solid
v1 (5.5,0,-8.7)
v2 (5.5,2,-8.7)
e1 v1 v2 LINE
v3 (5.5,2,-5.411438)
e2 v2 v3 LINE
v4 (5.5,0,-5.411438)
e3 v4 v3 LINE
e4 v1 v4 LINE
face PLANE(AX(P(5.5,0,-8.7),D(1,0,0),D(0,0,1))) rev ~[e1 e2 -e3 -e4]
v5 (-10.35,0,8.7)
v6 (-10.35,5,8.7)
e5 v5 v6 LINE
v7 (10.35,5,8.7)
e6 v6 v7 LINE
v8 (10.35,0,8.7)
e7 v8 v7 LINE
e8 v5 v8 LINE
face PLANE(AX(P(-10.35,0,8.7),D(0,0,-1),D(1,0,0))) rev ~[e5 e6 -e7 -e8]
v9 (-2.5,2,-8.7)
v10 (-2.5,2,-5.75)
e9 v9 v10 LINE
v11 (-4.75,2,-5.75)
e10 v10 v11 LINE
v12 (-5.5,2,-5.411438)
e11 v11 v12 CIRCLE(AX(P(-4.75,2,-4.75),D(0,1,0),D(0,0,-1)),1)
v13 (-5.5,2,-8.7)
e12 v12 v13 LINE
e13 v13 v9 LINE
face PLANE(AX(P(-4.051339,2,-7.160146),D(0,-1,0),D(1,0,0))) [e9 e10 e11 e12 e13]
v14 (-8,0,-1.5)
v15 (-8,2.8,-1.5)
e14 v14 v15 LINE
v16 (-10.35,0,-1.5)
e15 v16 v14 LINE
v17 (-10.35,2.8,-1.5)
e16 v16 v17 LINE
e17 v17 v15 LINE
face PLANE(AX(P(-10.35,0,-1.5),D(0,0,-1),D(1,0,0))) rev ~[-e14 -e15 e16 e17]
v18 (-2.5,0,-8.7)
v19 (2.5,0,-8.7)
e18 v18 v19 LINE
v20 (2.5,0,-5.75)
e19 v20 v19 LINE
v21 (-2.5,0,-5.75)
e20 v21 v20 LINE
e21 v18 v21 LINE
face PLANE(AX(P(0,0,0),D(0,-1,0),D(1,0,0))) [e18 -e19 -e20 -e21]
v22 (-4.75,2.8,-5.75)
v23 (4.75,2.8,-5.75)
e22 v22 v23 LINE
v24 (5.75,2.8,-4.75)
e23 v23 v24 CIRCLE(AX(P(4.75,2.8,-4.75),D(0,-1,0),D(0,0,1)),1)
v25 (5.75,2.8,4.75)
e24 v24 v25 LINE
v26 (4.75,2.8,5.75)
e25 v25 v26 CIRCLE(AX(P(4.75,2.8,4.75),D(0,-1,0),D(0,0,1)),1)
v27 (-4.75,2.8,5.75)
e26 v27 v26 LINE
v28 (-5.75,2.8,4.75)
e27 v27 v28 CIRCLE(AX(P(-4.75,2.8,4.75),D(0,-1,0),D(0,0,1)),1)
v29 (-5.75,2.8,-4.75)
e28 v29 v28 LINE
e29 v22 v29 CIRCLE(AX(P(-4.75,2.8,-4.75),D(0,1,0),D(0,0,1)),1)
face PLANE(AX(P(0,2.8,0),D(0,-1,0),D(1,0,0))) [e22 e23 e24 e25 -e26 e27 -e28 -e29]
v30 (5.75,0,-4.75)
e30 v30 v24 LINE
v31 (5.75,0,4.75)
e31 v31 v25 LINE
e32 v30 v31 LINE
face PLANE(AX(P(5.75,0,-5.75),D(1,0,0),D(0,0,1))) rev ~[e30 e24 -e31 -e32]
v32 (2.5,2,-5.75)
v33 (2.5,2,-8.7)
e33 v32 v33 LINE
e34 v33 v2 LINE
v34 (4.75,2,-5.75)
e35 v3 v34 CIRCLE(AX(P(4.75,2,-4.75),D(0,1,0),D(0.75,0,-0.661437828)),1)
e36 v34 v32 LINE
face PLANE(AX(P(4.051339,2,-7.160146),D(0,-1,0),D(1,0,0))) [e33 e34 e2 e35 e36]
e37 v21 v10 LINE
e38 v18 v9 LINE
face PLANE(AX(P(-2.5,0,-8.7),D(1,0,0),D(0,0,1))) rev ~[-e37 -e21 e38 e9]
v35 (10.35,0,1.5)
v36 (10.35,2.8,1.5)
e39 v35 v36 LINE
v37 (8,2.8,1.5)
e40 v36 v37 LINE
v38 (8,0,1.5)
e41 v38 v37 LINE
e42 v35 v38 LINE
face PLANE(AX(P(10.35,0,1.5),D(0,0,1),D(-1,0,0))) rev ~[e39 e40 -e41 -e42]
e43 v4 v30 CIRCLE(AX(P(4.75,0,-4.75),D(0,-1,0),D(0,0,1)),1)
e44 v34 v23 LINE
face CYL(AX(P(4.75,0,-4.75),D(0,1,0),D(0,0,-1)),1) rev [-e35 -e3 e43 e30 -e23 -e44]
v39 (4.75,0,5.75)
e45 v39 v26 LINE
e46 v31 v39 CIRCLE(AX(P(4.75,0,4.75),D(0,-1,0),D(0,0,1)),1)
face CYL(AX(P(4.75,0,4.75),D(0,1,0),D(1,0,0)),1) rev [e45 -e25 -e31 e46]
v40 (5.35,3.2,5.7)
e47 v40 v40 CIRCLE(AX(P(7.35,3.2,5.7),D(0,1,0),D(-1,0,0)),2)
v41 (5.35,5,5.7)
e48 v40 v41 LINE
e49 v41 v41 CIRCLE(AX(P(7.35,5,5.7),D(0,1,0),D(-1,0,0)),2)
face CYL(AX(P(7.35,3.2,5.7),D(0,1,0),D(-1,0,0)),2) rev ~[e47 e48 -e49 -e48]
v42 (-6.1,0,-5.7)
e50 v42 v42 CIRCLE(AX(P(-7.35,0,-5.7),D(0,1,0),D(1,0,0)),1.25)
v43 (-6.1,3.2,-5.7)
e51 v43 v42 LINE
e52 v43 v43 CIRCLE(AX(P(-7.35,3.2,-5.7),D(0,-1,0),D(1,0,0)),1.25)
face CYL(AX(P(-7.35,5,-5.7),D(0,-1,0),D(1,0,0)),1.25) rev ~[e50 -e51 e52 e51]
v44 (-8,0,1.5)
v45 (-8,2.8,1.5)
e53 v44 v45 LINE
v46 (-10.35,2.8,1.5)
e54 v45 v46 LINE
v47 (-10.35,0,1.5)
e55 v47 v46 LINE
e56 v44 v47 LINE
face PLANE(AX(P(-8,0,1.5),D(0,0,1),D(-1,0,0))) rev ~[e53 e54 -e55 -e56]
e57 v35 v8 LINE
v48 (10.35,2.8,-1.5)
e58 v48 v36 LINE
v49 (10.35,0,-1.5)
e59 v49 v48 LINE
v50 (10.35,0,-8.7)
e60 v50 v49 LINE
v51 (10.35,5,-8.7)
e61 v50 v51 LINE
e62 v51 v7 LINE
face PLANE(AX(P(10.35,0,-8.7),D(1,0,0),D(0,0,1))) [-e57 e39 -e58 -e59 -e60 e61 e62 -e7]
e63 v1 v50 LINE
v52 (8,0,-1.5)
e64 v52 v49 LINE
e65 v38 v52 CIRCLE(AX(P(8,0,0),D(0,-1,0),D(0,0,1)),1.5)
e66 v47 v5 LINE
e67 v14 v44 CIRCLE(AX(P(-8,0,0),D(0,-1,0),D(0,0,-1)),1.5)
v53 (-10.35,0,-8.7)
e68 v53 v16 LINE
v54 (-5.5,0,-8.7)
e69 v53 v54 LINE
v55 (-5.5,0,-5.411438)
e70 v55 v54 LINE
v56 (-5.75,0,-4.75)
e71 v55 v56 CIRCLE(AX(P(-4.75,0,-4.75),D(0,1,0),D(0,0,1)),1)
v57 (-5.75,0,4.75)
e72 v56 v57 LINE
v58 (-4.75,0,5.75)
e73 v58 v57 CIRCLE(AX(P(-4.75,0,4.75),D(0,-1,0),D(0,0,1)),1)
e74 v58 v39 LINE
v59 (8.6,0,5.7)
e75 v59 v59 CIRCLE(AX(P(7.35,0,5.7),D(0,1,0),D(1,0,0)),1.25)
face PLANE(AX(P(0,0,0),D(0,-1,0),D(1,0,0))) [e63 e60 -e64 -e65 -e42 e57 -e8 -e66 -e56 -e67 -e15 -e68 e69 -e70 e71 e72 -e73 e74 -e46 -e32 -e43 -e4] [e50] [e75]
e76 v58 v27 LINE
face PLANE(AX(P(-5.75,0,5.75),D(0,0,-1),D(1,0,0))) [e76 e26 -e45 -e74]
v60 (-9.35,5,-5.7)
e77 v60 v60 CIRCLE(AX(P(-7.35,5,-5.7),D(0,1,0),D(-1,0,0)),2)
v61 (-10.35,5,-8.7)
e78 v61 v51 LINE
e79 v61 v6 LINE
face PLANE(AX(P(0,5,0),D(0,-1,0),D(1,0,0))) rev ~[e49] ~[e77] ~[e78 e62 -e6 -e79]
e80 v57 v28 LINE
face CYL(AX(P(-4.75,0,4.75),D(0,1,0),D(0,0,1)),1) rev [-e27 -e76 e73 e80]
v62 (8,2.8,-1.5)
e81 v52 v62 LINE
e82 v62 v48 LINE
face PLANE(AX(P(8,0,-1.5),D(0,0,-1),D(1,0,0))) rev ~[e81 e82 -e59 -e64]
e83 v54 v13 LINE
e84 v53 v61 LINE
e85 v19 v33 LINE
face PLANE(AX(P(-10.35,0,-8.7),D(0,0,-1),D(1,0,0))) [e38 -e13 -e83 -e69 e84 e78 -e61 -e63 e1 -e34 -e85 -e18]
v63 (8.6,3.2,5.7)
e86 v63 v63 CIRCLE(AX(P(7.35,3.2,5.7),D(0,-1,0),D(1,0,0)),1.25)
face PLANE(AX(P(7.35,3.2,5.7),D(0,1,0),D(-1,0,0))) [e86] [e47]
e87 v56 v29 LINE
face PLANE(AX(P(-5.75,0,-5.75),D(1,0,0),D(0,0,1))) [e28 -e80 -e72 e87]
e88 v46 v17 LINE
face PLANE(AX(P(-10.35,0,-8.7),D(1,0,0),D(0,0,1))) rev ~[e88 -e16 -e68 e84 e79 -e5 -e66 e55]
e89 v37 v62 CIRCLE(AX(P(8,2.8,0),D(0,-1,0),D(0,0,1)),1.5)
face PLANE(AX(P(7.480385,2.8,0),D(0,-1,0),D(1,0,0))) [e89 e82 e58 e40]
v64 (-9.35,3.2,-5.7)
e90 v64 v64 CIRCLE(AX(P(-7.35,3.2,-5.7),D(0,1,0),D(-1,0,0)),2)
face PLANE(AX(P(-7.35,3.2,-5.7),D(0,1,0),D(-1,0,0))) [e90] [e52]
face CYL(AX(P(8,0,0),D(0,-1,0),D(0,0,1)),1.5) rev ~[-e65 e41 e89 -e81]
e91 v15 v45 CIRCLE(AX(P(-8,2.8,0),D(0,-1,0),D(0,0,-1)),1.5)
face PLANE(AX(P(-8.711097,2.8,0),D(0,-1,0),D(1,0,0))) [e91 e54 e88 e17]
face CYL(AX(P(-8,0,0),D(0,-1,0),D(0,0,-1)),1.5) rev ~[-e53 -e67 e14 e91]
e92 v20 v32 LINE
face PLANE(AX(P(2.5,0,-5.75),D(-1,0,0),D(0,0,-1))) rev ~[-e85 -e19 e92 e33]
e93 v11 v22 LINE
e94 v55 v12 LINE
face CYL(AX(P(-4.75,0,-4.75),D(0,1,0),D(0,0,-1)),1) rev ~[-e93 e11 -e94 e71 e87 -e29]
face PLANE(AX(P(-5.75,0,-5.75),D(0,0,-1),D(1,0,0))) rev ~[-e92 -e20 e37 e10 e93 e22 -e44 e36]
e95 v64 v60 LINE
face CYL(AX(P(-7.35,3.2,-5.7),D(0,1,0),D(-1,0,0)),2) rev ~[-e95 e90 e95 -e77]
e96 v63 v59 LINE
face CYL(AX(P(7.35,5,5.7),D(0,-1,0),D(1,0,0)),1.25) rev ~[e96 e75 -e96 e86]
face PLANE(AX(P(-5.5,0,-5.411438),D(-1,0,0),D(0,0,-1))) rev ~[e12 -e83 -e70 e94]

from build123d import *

# Parameters (mm, degrees)
F0_W           = 20.7
F0_H           = 17.4
F1_DEPTH       = 5
F2_W           = 11.5
F2_H           = 11.5
F3_DEPTH       = 2.8
F5_R           = 1
F7_DEPTH       = 2.8
F9_D           = 2.5
F9_DEPTH       = 5
F9_CBORE_D     = 4
F9_CBORE_DEPTH = 1.8
F9_TIP         = 0.7510757738
F11_DEPTH      = 2


# Not quite as in the source:
# - a feature names something its author has since deleted; it is built from what else it names


with BuildPart() as f1:
    # F0 (on Front) → F1 (new body)
    with BuildSketch(Plane.XZ):
        Rectangle(F0_W, F0_H)
    extrude(amount=-F1_DEPTH)

    # F2 (on face) → F3 (cut)
    with BuildSketch(Plane.XZ):
        Rectangle(F2_W, F2_H)
    extrude(amount=-F3_DEPTH, mode=Mode.SUBTRACT)

    # F5
    f5_edges = [f1.edges().sort_by_distance(p)[0] for p in [
        (-5.75, 1.4, 5.75),
        (5.75, 1.4, 5.75),
        (-5.75, 1.4, -5.75),
        (5.75, 1.4, -5.75),
    ]]
    fillet(f5_edges, radius=F5_R)

    # F6 (on face) → F7 (cut)
    with BuildSketch(Plane.XZ):
        with BuildLine():
            Line((-10.35, -1.5), (-8, -1.5))
            ThreePointArc((-8, -1.5), (-6.5, 0), (-8, 1.5))
            Line((-8, 1.5), (-10.35, 1.5))
            Line((-10.35, 1.5), (-10.35, -1.5))
        make_face()
        with BuildLine():
            ThreePointArc((8, 1.5), (6.5, 0), (8, -1.5))
            Line((8, -1.5), (8, 0))
            Line((8, 0), (8, 1.5))
        make_face()
        Polygon((8, -1.5), (10.35, -1.5), (10.35, 1.5), (8, 1.5), (8, 0), align=None)
    extrude(amount=-F7_DEPTH, mode=Mode.SUBTRACT)

    # F9
    with Locations(Plane(origin=(0, 5, 0), x_dir=(-1, 0, 0), z_dir=(0, 1, 0))):
        with Locations((7.35, -5.7), (-7.35, 5.7)):
            CounterBoreHole(F9_D / 2, F9_CBORE_D / 2, F9_CBORE_DEPTH, depth=F9_DEPTH)
            with Locations((0, 0, -(F9_DEPTH + F9_TIP / 2))):  # 118° drill point
                Cone(0, F9_D / 2, F9_TIP, mode=Mode.SUBTRACT)

    # F10 (on face) → F11 (cut)
    with BuildSketch(Plane.XZ):
        with BuildLine():
            Line((4.75, -5.75), (2.5, -5.75))
            Line((2.5, -5.75), (2.5, -8.7))
            Line((2.5, -8.7), (5.5, -8.7))
            Line((5.5, -8.7), (5.5, -5.4114378278))
            ThreePointArc((5.5, -5.4114378278), (5.1614378278, -5.6614378278), (4.75, -5.75))
        make_face()
        with BuildLine():
            Line((-2.5, -5.75), (-4.75, -5.75))
            ThreePointArc((-4.75, -5.75), (-5.1614378278, -5.6614378278), (-5.5, -5.4114378278))
            Line((-5.5, -5.4114378278), (-5.5, -8.7))
            Line((-5.5, -8.7), (-2.5, -8.7))
            Line((-2.5, -8.7), (-2.5, -5.75))
        make_face()
    extrude(amount=-F11_DEPTH, mode=Mode.SUBTRACT)


solid = f1.part
